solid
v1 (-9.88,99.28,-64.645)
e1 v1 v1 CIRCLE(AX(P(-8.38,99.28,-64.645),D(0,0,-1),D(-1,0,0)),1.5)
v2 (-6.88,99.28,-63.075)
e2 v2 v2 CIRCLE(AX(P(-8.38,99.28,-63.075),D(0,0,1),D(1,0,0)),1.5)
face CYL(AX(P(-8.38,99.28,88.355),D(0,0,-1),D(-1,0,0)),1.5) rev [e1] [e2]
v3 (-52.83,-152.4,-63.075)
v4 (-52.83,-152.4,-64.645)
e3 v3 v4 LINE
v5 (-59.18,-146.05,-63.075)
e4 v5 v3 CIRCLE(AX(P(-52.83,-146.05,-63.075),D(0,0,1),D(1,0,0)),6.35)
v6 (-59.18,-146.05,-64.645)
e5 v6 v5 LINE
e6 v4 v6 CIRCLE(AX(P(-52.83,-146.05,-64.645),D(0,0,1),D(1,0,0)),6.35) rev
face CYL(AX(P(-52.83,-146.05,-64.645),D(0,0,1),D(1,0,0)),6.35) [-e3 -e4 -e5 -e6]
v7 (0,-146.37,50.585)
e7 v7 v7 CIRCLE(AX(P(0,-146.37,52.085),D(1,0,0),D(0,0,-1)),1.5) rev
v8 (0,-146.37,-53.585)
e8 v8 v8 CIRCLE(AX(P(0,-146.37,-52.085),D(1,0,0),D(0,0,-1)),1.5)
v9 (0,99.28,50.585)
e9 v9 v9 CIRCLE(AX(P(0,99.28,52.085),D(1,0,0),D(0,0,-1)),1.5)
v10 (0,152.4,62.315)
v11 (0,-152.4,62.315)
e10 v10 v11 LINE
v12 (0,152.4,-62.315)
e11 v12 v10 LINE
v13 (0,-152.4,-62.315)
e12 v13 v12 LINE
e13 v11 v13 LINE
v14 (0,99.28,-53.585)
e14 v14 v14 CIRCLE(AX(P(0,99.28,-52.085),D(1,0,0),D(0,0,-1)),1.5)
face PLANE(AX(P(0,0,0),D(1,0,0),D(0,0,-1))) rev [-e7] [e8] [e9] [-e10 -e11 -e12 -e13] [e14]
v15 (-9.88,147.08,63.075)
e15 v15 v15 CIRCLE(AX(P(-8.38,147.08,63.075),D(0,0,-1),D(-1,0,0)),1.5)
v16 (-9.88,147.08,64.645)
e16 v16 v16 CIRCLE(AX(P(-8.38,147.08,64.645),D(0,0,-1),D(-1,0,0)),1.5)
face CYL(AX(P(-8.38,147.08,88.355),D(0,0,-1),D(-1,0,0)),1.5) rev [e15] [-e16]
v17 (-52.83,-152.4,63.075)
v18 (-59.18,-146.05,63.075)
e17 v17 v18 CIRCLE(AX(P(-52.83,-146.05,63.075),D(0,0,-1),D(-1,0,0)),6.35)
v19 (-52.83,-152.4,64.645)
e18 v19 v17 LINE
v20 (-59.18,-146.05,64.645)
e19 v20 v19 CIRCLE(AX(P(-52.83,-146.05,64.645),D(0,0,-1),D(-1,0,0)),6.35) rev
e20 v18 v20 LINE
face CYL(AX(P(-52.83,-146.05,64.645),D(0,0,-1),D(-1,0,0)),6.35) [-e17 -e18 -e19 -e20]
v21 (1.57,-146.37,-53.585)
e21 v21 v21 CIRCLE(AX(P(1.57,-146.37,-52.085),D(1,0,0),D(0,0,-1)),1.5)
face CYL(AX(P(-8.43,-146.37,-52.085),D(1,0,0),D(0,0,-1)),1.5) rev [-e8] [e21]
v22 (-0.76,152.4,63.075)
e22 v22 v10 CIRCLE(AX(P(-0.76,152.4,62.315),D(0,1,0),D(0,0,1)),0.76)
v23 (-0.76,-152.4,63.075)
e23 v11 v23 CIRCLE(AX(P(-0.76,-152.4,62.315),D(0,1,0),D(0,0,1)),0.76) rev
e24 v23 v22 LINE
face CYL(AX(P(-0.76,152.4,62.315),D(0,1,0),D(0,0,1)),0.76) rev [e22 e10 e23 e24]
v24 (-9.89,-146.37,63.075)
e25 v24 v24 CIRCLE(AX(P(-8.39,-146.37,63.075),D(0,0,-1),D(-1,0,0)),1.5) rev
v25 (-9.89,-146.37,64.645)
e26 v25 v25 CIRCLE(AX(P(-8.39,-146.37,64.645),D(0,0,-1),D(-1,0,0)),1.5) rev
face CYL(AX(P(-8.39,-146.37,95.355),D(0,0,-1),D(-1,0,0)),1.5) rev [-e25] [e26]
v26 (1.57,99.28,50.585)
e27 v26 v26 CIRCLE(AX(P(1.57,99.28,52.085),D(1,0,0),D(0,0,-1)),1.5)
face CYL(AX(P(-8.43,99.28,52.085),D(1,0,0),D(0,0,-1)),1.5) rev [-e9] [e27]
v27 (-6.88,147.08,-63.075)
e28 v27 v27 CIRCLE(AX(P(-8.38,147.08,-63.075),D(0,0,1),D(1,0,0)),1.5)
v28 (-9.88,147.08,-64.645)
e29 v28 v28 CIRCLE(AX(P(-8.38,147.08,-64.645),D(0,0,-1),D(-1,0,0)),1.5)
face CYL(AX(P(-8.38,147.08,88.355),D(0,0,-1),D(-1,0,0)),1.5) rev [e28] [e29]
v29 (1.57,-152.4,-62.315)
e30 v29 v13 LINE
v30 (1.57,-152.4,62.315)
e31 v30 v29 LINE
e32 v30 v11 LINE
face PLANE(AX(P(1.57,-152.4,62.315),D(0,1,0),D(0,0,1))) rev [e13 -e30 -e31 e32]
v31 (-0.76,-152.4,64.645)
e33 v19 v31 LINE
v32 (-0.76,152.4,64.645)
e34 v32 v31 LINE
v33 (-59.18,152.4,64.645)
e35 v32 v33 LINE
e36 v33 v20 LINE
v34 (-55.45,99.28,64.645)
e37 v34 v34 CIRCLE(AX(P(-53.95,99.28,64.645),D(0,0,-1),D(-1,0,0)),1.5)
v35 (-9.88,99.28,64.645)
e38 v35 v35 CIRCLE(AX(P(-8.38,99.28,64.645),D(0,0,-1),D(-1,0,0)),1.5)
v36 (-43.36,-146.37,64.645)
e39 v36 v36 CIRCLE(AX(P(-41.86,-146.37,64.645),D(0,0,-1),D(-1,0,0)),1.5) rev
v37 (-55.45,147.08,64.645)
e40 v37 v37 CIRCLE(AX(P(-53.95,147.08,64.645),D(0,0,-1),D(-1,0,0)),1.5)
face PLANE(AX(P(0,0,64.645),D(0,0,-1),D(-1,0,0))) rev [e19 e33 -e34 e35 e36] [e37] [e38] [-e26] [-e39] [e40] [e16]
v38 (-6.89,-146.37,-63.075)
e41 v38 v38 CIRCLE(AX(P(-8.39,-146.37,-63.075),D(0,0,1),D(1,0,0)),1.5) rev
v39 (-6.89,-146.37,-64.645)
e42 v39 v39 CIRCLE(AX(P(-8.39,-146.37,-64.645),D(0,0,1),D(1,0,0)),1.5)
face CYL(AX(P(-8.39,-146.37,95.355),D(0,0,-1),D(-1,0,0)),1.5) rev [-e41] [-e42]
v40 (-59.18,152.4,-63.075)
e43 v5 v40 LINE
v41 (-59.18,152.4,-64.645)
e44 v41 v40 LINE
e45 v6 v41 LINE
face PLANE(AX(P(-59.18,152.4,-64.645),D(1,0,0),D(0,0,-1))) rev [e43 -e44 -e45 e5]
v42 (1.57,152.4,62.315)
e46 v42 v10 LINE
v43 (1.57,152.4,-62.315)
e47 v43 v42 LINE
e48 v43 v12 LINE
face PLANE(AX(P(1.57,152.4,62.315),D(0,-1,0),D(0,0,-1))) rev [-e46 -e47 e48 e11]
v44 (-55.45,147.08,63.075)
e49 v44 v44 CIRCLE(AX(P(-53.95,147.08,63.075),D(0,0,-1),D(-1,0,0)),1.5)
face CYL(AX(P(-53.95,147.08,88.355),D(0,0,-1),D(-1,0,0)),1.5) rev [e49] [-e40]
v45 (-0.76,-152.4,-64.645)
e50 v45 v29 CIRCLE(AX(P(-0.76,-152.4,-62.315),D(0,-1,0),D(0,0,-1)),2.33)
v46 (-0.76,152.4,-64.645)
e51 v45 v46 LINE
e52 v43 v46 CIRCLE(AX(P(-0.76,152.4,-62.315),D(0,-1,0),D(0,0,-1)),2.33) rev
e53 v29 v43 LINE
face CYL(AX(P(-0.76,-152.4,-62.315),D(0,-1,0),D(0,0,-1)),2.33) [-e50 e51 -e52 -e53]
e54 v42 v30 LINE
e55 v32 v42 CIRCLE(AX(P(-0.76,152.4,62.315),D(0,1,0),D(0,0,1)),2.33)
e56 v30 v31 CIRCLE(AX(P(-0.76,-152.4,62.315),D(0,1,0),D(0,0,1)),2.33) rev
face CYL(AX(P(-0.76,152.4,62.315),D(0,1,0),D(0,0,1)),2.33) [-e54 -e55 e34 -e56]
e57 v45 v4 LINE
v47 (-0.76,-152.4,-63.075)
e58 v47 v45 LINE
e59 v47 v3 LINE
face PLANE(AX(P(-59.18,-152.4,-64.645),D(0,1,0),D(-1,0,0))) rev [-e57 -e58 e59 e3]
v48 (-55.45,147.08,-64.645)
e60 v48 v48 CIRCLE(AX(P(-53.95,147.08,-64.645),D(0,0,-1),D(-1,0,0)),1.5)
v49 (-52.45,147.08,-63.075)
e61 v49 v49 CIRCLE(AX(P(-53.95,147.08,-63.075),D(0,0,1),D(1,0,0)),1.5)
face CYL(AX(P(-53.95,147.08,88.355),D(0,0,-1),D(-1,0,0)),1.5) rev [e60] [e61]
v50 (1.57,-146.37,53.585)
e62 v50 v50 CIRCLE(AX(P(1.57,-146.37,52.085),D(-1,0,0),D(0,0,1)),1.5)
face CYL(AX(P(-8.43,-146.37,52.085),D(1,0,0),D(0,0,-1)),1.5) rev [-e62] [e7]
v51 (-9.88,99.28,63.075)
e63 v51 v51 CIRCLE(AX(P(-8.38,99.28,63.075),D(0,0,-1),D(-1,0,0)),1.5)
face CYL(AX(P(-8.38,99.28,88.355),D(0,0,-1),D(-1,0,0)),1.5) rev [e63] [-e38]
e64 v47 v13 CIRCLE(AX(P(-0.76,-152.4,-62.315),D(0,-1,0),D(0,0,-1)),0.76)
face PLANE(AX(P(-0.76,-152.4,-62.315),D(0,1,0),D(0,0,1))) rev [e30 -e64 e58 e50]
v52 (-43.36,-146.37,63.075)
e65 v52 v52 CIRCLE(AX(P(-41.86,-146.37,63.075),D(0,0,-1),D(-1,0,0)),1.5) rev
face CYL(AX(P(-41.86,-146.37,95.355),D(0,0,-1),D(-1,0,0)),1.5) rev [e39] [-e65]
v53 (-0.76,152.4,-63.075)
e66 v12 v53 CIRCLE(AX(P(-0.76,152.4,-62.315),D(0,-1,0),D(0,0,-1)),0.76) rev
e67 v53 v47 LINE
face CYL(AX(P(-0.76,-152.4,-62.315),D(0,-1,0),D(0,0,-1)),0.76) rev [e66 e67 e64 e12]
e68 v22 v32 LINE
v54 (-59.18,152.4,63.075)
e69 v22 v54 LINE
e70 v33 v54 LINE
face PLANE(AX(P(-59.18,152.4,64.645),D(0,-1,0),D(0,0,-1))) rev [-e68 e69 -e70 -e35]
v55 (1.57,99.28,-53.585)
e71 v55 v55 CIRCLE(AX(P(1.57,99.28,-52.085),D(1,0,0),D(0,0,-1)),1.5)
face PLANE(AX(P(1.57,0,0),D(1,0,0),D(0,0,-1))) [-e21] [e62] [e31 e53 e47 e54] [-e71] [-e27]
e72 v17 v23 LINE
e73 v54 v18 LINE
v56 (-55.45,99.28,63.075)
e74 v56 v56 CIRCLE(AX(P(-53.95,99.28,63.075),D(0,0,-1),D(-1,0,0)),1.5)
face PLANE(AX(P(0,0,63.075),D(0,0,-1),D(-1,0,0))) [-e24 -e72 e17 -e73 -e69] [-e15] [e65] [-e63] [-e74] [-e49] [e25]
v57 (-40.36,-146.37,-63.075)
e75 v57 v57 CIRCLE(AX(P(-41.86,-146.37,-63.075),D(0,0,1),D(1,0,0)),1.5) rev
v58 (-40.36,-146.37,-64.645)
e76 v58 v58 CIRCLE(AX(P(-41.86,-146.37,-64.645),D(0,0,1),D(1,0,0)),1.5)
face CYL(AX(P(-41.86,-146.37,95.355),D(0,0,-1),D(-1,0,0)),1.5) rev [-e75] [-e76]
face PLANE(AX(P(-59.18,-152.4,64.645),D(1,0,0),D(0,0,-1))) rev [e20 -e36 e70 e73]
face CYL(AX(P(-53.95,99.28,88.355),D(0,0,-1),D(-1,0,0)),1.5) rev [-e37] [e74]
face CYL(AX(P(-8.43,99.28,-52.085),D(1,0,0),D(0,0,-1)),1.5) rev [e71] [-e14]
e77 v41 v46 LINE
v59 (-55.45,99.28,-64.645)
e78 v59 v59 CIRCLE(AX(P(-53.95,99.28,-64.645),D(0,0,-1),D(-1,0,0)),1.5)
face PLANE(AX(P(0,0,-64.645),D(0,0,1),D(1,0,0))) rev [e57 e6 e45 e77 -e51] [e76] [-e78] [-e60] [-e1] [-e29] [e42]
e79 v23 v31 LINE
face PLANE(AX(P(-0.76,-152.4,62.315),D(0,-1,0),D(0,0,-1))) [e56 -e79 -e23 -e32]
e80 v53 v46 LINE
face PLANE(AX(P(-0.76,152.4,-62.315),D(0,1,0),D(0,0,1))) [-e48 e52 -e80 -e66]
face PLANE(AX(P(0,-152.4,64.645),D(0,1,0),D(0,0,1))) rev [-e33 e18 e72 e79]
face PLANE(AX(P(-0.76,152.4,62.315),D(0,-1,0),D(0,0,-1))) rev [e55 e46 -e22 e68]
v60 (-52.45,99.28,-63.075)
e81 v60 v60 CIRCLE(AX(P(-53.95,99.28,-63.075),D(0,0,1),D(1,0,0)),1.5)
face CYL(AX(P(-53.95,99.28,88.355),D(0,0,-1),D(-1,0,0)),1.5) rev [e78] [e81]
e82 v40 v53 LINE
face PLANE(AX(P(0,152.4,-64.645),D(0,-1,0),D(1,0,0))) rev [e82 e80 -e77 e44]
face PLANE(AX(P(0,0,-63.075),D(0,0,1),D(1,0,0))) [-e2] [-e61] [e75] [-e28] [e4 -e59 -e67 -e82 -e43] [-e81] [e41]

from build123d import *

# Parameters (mm, degrees)
SKETCH1_W               = 124.63
SKETCH1_H               = 304.8
BASE_FLANGE1_DEPTH      = 1.57
EDGE_FLANGE1_DEPTH      = 304.8
EDGE_FLANGE1_BEND_DEPTH = 304.8
FILLET1_R               = 6.35
HOLE1_START             = -64.645
HOLE1_OUTLINE_R         = 1.5
HOLE1_DEPTH             = 129.29
HOLE2_START             = -64.645
HOLE2_OUTLINE_R         = 1.5
HOLE2_DEPTH             = 129.29
SKETCH18_R              = 1.5
CUT_EXTRUDE1_DEPTH      = 10
SKETCH19_R              = 1.5
CUT_EXTRUDE2_DEPTH      = 10


# Read off the part's stored shape, not the designer's step: Hole1, Hole2
# Sheet-metal steps are written as plain solids
with BuildPart() as part:
    # Sketch1 → Base-Flange1 (new body)
    with BuildSketch(Plane(origin=(0, 0, 0), x_dir=(0, 0, -1), z_dir=(1, 0, 0))):
        Rectangle(SKETCH1_W, SKETCH1_H)
    extrude(amount=BASE_FLANGE1_DEPTH)

    # Edge-Flange1 section (across the edge) → Edge-Flange1 (add)
    with BuildSketch(Plane(origin=(0, -152.4, 63.075), x_dir=(0, 0, -1), z_dir=(0, 1, 0))):
        with BuildLine():
            Line((-1.57, 0.76), (-1.57, 59.18))
            Line((-1.57, 59.18), (0, 59.18))
            Line((0, 59.18), (0, 0.76))
            ThreePointArc((0, 0.76), (0.222598846, 0.222598846), (0.76, 0))
            Line((0.76, 0), (0.76, -1.57))
            ThreePointArc((0.76, -1.57), (-0.8875588, -0.8875588), (-1.57, 0.76))
        make_face()
    extrude(amount=EDGE_FLANGE1_DEPTH)

    # Edge-Flange1 section 2 (across the edge) → Edge-Flange1 bend (add)
    with BuildSketch(Plane(origin=(0, 152.4, -63.075), x_dir=(0, 0, 1), z_dir=(0, -1, 0))):
        with BuildLine():
            Line((-1.57, 0.76), (-1.57, 59.18))
            Line((-1.57, 59.18), (0, 59.18))
            Line((0, 59.18), (0, 0.76))
            ThreePointArc((0, 0.76), (0.222598846, 0.222598846), (0.76, 0))
            Line((0.76, 0), (0.76, -1.57))
            ThreePointArc((0.76, -1.57), (-0.8875588, -0.8875588), (-1.57, 0.76))
        make_face()
    extrude(amount=EDGE_FLANGE1_BEND_DEPTH)

    # Fillet1
    fillet1_edges = [part.edges().sort_by_distance(p)[0] for p in [
        (-59.18, -152.4, 63.86),
        (-59.18, -152.4, -63.86),
    ]]
    fillet(fillet1_edges, radius=FILLET1_R)

    # Hole1 outline → Hole1 (cut)
    with BuildSketch(Plane.XY.offset(HOLE1_START)):
        with Locations((-8.39, -146.37)):
            Circle(HOLE1_OUTLINE_R)
        with Locations((-41.86, -146.37)):
            Circle(HOLE1_OUTLINE_R)
    extrude(amount=HOLE1_DEPTH, mode=Mode.SUBTRACT)

    # Hole2 outline → Hole2 (cut)
    with BuildSketch(Plane.XY.offset(HOLE2_START)):
        with Locations((-53.95, 147.08)):
            Circle(HOLE2_OUTLINE_R)
        with Locations((-8.38, 147.08)):
            Circle(HOLE2_OUTLINE_R)
        with Locations((-8.38, 99.28)):
            Circle(HOLE2_OUTLINE_R)
        with Locations((-53.95, 99.28)):
            Circle(HOLE2_OUTLINE_R)
    extrude(amount=HOLE2_DEPTH, mode=Mode.SUBTRACT)

    # Sketch18 → Cut-Extrude1 (cut)
    with BuildSketch(Plane(origin=(1.57, 0, 0), x_dir=(0, 0, -1), z_dir=(1, 0, 0))):
        with Locations((52.085, -146.37)):
            Circle(SKETCH18_R)
    cut_extrude1 = extrude(amount=-CUT_EXTRUDE1_DEPTH, mode=Mode.SUBTRACT)

    # Mirror1: Cut-Extrude1 across plane
    add(cut_extrude1.mirror(Plane.XY), mode=Mode.SUBTRACT)

    # Sketch19 → Cut-Extrude2 (cut)
    with BuildSketch(Plane(origin=(1.57, 0, 0), x_dir=(0, 0, -1), z_dir=(1, 0, 0))):
        with Locations((52.085, 99.28)):
            Circle(SKETCH19_R)
        with Locations((-52.085, 99.28)):
            Circle(SKETCH19_R)
    extrude(amount=-CUT_EXTRUDE2_DEPTH, mode=Mode.SUBTRACT)


solid = part.part
